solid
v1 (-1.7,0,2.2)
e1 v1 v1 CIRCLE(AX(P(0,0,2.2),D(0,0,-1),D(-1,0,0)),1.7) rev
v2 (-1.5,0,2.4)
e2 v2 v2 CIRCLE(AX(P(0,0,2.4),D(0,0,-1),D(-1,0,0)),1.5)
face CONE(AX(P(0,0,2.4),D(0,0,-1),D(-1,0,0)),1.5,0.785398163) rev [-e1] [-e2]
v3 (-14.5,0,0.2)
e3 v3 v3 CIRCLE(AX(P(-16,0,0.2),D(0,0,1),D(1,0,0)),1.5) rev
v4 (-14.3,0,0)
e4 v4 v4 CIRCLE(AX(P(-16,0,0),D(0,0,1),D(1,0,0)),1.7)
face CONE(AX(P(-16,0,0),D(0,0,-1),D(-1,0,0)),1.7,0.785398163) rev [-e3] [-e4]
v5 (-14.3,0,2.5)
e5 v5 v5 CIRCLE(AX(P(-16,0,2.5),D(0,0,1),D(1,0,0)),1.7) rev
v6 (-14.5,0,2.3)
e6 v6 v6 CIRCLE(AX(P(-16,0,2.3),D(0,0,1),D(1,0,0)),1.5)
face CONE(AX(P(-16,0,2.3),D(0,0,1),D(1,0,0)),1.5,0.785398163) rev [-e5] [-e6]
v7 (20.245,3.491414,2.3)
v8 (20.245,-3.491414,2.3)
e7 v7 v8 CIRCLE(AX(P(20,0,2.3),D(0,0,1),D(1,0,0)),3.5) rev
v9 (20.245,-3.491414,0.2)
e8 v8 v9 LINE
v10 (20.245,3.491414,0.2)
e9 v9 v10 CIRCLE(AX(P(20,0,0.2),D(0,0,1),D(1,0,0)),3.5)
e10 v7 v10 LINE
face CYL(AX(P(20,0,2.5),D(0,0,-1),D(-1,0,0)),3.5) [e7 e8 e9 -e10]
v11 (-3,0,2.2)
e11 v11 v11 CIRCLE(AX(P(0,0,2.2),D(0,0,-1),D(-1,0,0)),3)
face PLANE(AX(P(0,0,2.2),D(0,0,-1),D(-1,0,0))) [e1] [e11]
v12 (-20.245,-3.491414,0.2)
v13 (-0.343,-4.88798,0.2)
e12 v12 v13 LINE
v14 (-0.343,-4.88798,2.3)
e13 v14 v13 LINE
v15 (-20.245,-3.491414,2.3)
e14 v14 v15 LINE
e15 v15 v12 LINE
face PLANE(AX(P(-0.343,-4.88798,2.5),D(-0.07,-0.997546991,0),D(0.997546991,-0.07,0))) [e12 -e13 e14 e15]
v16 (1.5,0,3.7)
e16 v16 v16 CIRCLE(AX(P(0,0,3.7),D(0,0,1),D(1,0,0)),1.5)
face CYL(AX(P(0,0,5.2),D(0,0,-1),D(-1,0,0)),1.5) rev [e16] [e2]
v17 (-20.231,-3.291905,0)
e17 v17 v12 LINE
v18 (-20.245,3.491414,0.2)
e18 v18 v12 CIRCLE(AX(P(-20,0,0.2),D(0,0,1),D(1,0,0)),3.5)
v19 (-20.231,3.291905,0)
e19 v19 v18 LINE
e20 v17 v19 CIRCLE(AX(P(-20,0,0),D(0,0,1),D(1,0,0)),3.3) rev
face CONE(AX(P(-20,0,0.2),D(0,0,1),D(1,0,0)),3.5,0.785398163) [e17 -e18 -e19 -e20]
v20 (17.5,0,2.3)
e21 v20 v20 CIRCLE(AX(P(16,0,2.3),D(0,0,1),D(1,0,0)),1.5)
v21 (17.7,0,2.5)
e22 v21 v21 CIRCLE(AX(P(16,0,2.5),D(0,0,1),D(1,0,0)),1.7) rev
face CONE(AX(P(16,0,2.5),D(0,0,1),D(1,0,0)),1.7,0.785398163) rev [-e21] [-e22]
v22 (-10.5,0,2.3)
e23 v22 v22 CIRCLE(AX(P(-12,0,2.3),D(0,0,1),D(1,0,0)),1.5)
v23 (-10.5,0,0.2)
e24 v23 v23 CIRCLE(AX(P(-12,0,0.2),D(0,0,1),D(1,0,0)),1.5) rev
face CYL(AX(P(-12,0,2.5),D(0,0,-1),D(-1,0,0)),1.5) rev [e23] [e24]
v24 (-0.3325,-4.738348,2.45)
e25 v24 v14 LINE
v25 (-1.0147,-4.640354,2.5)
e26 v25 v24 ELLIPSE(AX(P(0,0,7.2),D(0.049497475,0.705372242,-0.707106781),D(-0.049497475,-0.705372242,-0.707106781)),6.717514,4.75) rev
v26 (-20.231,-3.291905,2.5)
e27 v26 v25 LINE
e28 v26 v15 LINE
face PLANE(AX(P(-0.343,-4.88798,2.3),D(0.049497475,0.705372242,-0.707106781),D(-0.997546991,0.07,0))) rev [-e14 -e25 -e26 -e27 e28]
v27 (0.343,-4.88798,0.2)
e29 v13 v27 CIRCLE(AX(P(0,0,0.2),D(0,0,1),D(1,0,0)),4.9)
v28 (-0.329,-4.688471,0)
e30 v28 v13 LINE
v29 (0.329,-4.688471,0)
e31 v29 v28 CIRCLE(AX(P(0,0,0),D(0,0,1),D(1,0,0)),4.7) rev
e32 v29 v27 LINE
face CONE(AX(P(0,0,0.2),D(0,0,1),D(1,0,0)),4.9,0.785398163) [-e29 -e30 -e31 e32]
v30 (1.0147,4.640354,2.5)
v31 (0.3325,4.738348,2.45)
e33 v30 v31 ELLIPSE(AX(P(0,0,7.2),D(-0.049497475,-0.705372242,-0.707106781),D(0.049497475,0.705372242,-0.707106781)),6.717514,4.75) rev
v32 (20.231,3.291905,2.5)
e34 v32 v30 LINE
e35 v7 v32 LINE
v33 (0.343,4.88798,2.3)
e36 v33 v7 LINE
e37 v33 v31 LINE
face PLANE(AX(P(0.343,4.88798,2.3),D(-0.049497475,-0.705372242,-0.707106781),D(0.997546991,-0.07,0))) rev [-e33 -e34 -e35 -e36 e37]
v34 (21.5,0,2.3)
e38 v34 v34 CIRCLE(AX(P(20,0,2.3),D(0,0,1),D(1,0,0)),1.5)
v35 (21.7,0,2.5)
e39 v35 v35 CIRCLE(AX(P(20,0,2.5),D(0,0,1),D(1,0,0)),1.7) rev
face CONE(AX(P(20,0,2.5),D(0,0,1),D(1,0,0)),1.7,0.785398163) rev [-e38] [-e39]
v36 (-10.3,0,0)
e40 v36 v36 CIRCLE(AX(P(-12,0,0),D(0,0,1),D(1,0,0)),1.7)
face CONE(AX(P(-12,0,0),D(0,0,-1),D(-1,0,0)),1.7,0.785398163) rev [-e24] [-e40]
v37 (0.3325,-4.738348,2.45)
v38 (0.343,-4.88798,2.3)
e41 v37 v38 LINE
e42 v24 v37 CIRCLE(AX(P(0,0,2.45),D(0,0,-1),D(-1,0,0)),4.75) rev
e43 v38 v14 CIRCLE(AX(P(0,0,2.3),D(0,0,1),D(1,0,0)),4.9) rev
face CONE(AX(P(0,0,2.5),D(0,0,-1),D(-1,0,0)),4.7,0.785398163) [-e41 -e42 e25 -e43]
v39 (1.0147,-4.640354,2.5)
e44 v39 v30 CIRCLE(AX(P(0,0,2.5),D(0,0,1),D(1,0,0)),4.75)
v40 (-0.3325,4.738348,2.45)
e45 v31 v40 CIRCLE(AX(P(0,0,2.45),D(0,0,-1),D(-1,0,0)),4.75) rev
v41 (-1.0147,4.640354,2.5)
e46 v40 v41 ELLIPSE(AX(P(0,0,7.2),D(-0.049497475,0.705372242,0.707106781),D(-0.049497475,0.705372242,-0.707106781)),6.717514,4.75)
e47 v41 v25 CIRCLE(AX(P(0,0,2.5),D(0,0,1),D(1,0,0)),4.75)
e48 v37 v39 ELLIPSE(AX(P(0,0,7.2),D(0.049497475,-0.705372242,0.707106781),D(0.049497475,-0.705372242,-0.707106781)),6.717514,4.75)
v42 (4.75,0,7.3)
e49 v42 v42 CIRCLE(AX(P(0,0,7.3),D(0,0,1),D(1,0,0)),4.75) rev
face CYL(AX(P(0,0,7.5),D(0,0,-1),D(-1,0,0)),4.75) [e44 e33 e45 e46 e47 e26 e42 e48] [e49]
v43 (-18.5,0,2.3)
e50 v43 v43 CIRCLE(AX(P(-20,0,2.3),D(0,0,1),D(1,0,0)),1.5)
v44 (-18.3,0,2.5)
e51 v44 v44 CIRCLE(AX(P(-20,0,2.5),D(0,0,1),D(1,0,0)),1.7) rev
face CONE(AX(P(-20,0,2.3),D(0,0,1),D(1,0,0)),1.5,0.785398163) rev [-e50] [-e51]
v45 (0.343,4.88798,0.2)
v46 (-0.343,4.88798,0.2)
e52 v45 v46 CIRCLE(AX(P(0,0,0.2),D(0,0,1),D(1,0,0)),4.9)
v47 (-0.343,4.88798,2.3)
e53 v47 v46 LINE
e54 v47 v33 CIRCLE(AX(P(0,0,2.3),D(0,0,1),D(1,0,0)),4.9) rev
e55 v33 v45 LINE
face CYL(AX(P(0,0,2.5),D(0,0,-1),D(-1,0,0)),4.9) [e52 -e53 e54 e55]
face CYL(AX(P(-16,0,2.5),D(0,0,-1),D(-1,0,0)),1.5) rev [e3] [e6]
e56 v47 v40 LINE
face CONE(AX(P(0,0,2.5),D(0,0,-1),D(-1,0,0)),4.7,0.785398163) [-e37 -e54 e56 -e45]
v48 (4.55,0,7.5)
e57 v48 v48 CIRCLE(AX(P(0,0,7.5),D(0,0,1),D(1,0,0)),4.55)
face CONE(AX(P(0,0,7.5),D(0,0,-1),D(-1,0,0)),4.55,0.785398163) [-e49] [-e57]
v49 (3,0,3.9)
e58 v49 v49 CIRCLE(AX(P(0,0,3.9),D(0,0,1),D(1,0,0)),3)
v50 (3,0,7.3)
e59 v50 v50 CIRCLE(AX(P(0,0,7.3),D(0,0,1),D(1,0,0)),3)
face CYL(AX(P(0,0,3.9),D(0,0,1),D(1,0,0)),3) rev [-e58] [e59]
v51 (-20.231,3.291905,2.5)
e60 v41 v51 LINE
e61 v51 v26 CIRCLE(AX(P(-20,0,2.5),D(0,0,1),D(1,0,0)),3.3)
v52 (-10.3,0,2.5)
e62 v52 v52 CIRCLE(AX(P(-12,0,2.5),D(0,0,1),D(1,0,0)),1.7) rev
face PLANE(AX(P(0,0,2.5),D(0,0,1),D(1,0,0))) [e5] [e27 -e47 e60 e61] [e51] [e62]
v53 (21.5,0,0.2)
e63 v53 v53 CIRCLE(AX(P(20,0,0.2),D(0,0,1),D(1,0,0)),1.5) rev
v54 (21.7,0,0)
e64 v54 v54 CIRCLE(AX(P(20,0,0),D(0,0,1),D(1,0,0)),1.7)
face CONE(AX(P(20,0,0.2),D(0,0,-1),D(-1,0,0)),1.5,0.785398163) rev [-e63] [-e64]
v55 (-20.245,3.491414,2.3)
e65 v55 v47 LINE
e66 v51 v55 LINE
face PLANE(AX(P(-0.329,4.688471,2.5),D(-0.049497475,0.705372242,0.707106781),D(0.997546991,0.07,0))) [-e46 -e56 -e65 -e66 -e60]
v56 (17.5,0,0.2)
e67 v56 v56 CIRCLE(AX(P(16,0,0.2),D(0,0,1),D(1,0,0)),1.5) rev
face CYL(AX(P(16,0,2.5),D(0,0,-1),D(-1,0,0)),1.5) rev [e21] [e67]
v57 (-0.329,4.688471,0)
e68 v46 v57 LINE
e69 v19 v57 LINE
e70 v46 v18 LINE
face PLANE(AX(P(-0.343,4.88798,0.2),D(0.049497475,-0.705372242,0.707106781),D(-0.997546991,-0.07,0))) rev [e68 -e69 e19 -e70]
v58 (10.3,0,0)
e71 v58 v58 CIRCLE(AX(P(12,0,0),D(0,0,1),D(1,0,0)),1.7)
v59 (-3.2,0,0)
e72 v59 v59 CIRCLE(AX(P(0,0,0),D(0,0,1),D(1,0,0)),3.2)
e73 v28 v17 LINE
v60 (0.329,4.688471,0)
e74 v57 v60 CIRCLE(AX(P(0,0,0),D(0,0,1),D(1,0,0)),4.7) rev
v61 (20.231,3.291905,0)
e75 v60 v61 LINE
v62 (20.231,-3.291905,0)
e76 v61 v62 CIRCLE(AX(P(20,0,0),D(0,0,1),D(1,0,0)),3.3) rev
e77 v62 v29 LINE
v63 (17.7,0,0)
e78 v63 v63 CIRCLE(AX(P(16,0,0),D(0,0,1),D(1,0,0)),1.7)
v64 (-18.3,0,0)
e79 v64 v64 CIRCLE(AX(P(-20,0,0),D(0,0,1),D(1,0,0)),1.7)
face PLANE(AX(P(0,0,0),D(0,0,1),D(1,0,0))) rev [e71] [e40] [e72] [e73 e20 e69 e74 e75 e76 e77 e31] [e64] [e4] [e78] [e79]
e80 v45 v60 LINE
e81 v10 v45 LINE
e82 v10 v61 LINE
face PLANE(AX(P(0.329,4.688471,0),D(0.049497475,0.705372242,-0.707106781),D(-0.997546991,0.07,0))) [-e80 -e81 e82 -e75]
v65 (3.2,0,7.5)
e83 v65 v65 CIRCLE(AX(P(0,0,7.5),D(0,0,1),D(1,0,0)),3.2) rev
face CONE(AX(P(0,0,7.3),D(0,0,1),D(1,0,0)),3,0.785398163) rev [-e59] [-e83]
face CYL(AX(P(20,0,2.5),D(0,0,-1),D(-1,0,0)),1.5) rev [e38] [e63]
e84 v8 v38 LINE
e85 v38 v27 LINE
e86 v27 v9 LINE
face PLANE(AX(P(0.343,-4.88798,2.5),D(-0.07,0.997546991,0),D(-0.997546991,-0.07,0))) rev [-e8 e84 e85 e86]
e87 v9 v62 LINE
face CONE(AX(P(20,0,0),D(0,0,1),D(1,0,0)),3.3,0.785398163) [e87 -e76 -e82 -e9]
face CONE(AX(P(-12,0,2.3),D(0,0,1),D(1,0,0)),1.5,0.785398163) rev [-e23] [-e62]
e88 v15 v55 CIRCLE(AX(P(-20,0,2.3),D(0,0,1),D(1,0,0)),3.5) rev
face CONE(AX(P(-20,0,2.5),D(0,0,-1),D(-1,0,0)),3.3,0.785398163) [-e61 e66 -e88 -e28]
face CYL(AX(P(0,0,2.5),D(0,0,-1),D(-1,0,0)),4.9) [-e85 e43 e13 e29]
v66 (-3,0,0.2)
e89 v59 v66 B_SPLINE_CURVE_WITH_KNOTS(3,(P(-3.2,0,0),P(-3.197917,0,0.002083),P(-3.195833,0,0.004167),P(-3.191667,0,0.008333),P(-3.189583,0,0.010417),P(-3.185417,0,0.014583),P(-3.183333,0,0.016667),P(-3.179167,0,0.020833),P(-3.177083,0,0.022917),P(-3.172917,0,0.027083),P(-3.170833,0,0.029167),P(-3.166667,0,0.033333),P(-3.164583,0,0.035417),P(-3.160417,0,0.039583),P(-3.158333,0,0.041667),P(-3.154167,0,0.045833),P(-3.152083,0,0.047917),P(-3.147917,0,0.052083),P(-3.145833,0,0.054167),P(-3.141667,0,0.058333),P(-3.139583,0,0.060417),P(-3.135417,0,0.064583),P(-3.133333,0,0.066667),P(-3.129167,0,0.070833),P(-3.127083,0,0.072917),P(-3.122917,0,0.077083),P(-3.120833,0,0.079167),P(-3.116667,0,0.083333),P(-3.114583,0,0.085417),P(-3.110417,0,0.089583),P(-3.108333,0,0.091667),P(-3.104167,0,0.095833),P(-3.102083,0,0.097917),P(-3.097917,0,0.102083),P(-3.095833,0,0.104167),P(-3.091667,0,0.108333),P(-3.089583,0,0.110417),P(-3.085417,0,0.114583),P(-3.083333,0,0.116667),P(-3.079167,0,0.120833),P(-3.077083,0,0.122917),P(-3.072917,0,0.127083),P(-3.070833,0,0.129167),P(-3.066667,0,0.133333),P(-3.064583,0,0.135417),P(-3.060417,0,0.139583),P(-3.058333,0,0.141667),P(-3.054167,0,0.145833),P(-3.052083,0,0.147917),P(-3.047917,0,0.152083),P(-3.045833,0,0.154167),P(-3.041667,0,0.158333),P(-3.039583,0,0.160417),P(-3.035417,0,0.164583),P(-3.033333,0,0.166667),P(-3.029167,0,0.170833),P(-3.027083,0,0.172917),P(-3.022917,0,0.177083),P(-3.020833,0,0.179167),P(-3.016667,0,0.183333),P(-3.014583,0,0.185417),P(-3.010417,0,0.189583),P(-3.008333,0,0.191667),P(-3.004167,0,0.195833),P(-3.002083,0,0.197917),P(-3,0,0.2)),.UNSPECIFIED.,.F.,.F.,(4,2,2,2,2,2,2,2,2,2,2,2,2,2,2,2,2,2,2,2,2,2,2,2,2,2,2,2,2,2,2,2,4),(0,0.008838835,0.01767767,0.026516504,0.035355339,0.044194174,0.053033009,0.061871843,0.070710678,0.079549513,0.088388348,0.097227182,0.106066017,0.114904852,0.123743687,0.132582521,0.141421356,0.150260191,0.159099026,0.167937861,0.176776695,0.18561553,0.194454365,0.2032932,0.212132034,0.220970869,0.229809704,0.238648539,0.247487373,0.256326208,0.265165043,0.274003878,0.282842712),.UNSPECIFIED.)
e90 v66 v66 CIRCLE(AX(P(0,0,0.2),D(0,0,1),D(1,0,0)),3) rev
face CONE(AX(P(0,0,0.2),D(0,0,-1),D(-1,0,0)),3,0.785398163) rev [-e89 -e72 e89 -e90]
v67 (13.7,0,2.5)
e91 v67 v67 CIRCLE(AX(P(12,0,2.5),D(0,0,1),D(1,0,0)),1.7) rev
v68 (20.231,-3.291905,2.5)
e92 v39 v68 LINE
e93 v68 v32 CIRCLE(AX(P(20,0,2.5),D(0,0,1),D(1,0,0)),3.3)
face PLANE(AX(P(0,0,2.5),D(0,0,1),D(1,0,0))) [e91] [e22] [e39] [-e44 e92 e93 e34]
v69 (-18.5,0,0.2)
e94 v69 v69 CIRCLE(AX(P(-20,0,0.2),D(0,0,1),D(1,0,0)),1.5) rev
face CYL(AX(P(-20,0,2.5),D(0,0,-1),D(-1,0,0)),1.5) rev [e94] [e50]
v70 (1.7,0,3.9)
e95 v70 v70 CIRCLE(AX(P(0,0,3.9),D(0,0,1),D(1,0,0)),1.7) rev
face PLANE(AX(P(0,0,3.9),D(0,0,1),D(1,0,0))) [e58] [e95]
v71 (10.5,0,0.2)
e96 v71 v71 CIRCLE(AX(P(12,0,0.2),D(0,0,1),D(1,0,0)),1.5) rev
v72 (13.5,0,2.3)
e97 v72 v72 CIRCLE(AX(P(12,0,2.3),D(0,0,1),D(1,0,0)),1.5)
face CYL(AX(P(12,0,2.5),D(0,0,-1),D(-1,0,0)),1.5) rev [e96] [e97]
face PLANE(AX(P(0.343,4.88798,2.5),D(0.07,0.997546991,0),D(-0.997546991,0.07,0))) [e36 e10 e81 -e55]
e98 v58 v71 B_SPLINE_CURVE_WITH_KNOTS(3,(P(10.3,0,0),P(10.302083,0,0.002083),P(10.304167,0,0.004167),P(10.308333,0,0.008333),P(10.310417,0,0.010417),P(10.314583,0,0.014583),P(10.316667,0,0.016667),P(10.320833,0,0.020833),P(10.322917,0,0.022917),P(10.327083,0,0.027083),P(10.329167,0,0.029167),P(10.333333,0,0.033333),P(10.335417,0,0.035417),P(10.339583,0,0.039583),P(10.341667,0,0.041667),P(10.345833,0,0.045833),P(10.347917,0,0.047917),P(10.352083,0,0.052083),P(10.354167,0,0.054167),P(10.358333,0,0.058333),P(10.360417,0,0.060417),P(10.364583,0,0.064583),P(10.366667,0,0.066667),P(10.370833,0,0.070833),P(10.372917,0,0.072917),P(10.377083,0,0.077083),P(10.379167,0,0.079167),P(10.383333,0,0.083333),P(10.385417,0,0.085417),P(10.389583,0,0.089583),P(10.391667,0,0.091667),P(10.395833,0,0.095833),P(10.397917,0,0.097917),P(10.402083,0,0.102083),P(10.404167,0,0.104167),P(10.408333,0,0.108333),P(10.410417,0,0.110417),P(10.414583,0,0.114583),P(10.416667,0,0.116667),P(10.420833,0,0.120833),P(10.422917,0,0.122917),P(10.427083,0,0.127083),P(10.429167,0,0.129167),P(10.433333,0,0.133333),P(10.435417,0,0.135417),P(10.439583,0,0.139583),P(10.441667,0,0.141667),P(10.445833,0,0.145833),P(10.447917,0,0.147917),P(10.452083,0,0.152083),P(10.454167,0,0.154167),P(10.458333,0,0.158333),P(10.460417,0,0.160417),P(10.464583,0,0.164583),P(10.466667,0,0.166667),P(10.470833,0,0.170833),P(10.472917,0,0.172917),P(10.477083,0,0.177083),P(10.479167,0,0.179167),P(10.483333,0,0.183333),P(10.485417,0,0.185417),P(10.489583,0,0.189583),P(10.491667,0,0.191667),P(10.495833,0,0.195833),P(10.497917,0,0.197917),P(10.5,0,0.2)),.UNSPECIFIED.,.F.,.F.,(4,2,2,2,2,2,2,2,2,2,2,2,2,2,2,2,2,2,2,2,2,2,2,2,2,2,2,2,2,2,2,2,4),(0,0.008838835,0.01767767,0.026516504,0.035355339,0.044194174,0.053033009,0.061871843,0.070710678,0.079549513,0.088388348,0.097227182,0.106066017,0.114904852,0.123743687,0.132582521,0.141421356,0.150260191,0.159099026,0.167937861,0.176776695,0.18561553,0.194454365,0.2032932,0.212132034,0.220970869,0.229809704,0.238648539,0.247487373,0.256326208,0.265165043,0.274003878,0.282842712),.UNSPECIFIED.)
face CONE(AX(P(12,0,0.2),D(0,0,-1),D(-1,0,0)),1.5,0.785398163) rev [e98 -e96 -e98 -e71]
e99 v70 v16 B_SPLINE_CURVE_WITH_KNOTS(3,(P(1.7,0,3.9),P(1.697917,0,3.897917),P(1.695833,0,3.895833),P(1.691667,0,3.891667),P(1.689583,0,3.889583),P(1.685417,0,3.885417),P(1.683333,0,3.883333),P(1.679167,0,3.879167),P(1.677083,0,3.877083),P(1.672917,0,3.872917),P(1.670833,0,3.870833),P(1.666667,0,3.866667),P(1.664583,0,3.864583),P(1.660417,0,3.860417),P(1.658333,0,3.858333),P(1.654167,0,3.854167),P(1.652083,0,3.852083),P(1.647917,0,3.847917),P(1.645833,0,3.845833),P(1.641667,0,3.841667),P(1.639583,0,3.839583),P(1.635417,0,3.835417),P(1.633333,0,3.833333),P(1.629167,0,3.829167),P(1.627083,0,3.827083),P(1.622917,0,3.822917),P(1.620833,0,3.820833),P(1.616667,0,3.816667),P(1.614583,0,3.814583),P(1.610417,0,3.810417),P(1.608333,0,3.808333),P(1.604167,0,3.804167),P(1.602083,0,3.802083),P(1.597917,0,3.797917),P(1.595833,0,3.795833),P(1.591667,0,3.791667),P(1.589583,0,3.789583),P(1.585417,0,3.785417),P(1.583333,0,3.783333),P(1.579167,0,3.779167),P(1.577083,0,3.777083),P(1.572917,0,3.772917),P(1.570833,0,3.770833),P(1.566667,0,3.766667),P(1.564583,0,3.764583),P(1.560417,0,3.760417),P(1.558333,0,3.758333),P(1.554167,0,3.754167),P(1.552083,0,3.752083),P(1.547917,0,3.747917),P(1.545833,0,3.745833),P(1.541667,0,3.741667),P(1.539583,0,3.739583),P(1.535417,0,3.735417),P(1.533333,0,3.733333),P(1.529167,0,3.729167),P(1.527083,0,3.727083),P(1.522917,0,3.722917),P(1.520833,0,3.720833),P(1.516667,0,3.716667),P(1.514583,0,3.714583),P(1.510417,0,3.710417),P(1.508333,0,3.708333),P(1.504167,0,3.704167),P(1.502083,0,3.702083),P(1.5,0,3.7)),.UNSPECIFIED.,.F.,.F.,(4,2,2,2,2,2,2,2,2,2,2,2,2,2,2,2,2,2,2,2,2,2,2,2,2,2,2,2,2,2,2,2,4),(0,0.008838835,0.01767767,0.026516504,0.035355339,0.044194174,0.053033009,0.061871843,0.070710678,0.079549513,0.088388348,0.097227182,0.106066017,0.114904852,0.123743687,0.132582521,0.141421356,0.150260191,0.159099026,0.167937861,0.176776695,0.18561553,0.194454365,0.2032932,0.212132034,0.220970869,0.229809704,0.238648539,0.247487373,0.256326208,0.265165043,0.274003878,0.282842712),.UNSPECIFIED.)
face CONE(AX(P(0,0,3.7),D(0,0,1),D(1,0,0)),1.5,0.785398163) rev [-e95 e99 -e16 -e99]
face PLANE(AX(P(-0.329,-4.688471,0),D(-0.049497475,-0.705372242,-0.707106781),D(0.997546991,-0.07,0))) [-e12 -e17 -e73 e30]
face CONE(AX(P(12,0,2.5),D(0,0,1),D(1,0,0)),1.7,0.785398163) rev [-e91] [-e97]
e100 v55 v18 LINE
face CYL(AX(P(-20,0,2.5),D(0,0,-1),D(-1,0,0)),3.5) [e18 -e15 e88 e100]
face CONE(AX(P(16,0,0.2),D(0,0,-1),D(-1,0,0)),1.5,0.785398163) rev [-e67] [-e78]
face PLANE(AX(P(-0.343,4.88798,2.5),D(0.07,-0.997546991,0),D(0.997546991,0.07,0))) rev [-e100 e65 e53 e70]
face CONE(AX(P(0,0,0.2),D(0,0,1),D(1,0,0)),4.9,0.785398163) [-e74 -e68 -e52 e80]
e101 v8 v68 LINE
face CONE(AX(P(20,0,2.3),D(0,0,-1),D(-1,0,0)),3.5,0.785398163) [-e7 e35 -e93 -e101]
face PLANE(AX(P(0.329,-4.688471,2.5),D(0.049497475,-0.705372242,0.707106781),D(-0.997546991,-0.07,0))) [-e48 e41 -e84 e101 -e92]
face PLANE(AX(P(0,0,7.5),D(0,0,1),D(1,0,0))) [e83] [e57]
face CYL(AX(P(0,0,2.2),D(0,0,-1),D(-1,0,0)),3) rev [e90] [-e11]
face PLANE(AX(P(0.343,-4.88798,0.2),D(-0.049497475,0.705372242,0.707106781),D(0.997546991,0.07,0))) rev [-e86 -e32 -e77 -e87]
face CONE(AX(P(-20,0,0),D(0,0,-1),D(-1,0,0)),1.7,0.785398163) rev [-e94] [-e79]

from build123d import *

# Parameters (mm, degrees)
SKETCH_1_R          = 1.5
EXTRUDE_1_DEPTH     = 2.5
SKETCH_2_R          = 4.75
EXTRUDE_2_DEPTH     = 5
SKETCH_3_R          = 3
CUT_EXTRUDE_1_DEPTH = 3.6
CUT_EXTRUDE_START   = -2.2
SKETCH_4_R          = 3
CUT_EXTRUDE_2_DEPTH = 2.2
SKETCH_5_R          = 1.5
CUT_EXTRUDE_3_DEPTH = 3
CHAMFER_1_SIZE      = 0.2


with BuildPart() as part:
    # 草图1 → 凸台-拉伸1 (new body)
    with BuildSketch(Plane.XY):
        with BuildLine():
            Line((0.343, 4.887980258), (20.245, 3.49141447))
            ThreePointArc((20.245, 3.49141447), (23.5, 0), (20.245, -3.49141447))
            Line((20.245, -3.49141447), (0.343, -4.887980258))
            ThreePointArc((0.343, -4.887980258), (0, -4.9), (-0.343, -4.887980258))
            Line((-0.343, -4.887980258), (-20.245, -3.49141447))
            ThreePointArc((-20.245, -3.49141447), (-23.5, 0), (-20.245, 3.49141447))
            Line((-20.245, 3.49141447), (-0.343, 4.887980258))
            ThreePointArc((-0.343, 4.887980258), (0, 4.9), (0.343, 4.887980258))
        make_face()
        with Locations((-12, 0)):
            Circle(SKETCH_1_R, mode=Mode.SUBTRACT)
        with Locations((-16, 0)):
            Circle(SKETCH_1_R, mode=Mode.SUBTRACT)
        with Locations((-20, 0)):
            Circle(SKETCH_1_R, mode=Mode.SUBTRACT)
        with Locations((20, 0)):
            Circle(SKETCH_1_R, mode=Mode.SUBTRACT)
        with Locations((16, 0)):
            Circle(SKETCH_1_R, mode=Mode.SUBTRACT)
        with Locations(Location((12, 0, 0), (0, 0, 180))):
            Circle(SKETCH_1_R, mode=Mode.SUBTRACT)
    extrude(amount=EXTRUDE_1_DEPTH)

    # 草图2 → 凸台-拉伸2 (add)
    with BuildSketch(Plane.XY.offset(2.5)):
        Circle(SKETCH_2_R)
    extrude(amount=EXTRUDE_2_DEPTH)

    # 草图3 → 切除-拉伸1 (cut)
    with BuildSketch(Plane.XY.offset(7.5)):
        Circle(SKETCH_3_R)
    extrude(amount=-CUT_EXTRUDE_1_DEPTH, mode=Mode.SUBTRACT)

    # 草图4 → 切除-拉伸2 (cut)
    with BuildSketch(Plane(origin=(0, 0, 0), x_dir=(-1, 0, 0), z_dir=(0, 0, -1)).offset(CUT_EXTRUDE_START)):
        with Locations(Location((0, 0, 0), (0, 0, 180))):
            Circle(SKETCH_4_R)
    extrude(amount=CUT_EXTRUDE_2_DEPTH, mode=Mode.SUBTRACT)

    # 草图5 → 切除-拉伸3 (cut)
    with BuildSketch(Plane(origin=(0, 0, 2.2), x_dir=(-1, 0, 0), z_dir=(0, 0, -1))):
        Circle(SKETCH_5_R)
    extrude(amount=-CUT_EXTRUDE_3_DEPTH, mode=Mode.SUBTRACT)

    # 倒角1
    # the kernel refuses this chamfer: 0.2 mm, written as the material it takes off along each edge
    with BuildSketch(Plane(origin=(-20, 0, 2.5), x_dir=(-0.06999999999999927, -0.9975469913743413, 0), z_dir=(0.9975469913743413, -0.06999999999999927, 0))) as chamfer_1_piece_1:
        Polygon((3.5, CHAMFER_1_SIZE), (3.5 - CHAMFER_1_SIZE, 0), (3.5, 0), align=None)
    revolve(axis=Axis((-20, 0, 2.5), (0, 0, -1)), revolution_arc=171.972025564, mode=Mode.SUBTRACT)
    with BuildSketch(Plane(origin=(-20.245, 3.49141447, 0), x_dir=(-0.0019247113627411001, 0.027428428988091162, 0.9996219169112966), z_dir=(0.9975469913743413, 0.07000000000000042, 0))) as chamfer_1_piece_2:
        Polygon((CHAMFER_1_SIZE * 0.999621916911, CHAMFER_1_SIZE * 0.0274958766106), (-CHAMFER_1_SIZE * 0.0274958766106, CHAMFER_1_SIZE * 0.999621916911), (0, 0), align=None)
    extrude(amount=19.950939827, mode=Mode.SUBTRACT)
    with BuildSketch(Plane(origin=(0, 0, 0), x_dir=(-0.0700000000000013, 0.9975469913743411, 0), z_dir=(-0.9975469913743411, -0.0700000000000013, 0))) as chamfer_1_piece_3:
        Polygon((4.9, -CHAMFER_1_SIZE), (4.9 - CHAMFER_1_SIZE, 0), (4.9, 0), align=None)
    revolve(axis=Axis((0, 0, 0), (0, 0, -1)), revolution_arc=8.027974436, mode=Mode.SUBTRACT)
    with BuildSketch(Plane(origin=(-0.343, -4.887980258, 2.5), x_dir=(0.06997353418379068, 0.9971698357267157, 0.02749587661058734), z_dir=(-0.9975469913743412, 0.06999999999999992, 0))) as chamfer_1_piece_4_section:
        Polygon((CHAMFER_1_SIZE * 0.999621916911, CHAMFER_1_SIZE * 0.0274958766106), (-CHAMFER_1_SIZE * 0.0274958766106, CHAMFER_1_SIZE * 0.999621916911), (0, 0), align=None)
    chamfer_1_piece_4 = extrude(amount=19.950939827, mode=Mode.PRIVATE)
    chamfer_1_piece_4 = chamfer_1_piece_4 - Plane(origin=(0, 0, 2.433954509), x_dir=(1, 0, 0), z_dir=(0, 0, -1)) * Cylinder(4.75, 41, mode=Mode.PRIVATE)
    add(chamfer_1_piece_4, mode=Mode.SUBTRACT)
    with BuildSketch(Plane(origin=(0, 0, 2.5), x_dir=(0.06999999999999668, -0.9975469913743414, 0), z_dir=(0.9975469913743414, 0.06999999999999668, 0))) as chamfer_1_piece_5_section:
        Polygon((4.9 - CHAMFER_1_SIZE, 0), (4.9, CHAMFER_1_SIZE), (4.9, 0), align=None)
    chamfer_1_piece_5 = revolve(axis=Axis((0, 0, 2.5), (0, 0, -1)), revolution_arc=8.027974436, mode=Mode.PRIVATE)
    chamfer_1_piece_5 = chamfer_1_piece_5 - Plane(origin=(0, 0, 2.429409395), x_dir=(1, 0, 0), z_dir=(0, 0, -1)) * Cylinder(4.75, 20, mode=Mode.PRIVATE)
    add(chamfer_1_piece_5, mode=Mode.SUBTRACT)
    with BuildSketch(Plane(origin=(20.245, -3.49141447, 2.5), x_dir=(-0.06997353418379093, 0.9971698357267157, 0.027495876610587357), z_dir=(-0.9975469913743413, -0.07000000000000017, 0))) as chamfer_1_piece_6_section:
        Polygon((CHAMFER_1_SIZE * 0.999621916911, CHAMFER_1_SIZE * 0.0274958766106), (-CHAMFER_1_SIZE * 0.0274958766106, CHAMFER_1_SIZE * 0.999621916911), (0, 0), align=None)
    chamfer_1_piece_6 = extrude(amount=19.950939827, mode=Mode.PRIVATE)
    chamfer_1_piece_6 = chamfer_1_piece_6 - Plane(origin=(0, 0, 2.433954509), x_dir=(1, 0, 0), z_dir=(0, 0, -1)) * Cylinder(4.75, 41, mode=Mode.PRIVATE)
    add(chamfer_1_piece_6, mode=Mode.SUBTRACT)
    with BuildSketch(Plane(origin=(-12, 0, 0), x_dir=(1, 0, 0), z_dir=(0, -1, 0))) as chamfer_1_piece_7:
        Polygon((1.5 + CHAMFER_1_SIZE, 0), (1.5, CHAMFER_1_SIZE), (1.5, 0), align=None)
    revolve(axis=Axis((-12, 0, 0), (0, 0, 1)), mode=Mode.SUBTRACT)
    with BuildSketch(Plane(origin=(-12, 0, 2.5), x_dir=(1, 0, 0), z_dir=(0, -1, 0))) as chamfer_1_piece_8:
        Polygon((1.5 + CHAMFER_1_SIZE, 0), (1.5, -CHAMFER_1_SIZE), (1.5, 0), align=None)
    revolve(axis=Axis((-12, 0, 2.5), (0, 0, 1)), mode=Mode.SUBTRACT)
    with BuildSketch(Plane(origin=(20, 0, 2.5), x_dir=(0.06999999999999927, 0.9975469913743413, 0), z_dir=(-0.9975469913743413, 0.06999999999999927, 0))) as chamfer_1_piece_9:
        Polygon((3.5 - CHAMFER_1_SIZE, 0), (3.5, CHAMFER_1_SIZE), (3.5, 0), align=None)
    revolve(axis=Axis((20, 0, 2.5), (0, 0, -1)), revolution_arc=171.972025564, mode=Mode.SUBTRACT)
    with BuildSketch(Plane(origin=(16, 0, 2.5), x_dir=(1, 0, 0), z_dir=(0, -1, 0))) as chamfer_1_piece_10:
        Polygon((1.5 + CHAMFER_1_SIZE, 0), (1.5, -CHAMFER_1_SIZE), (1.5, 0), align=None)
    revolve(axis=Axis((16, 0, 2.5), (0, 0, 1)), mode=Mode.SUBTRACT)
    with BuildSketch(Plane(origin=(0.343, 4.887980258, 2.5), x_dir=(-0.06997353418379092, -0.9971698357267157, 0.02749587661058734), z_dir=(0.9975469913743413, -0.07000000000000017, 0))) as chamfer_1_piece_11_section:
        Polygon((CHAMFER_1_SIZE * 0.999621916911, CHAMFER_1_SIZE * 0.0274958766106), (-CHAMFER_1_SIZE * 0.0274958766106, CHAMFER_1_SIZE * 0.999621916911), (0, 0), align=None)
    chamfer_1_piece_11 = extrude(amount=19.950939827, mode=Mode.PRIVATE)
    chamfer_1_piece_11 = chamfer_1_piece_11 - Plane(origin=(0, 0, 2.433954509), x_dir=(1, 0, 0), z_dir=(0, 0, -1)) * Cylinder(4.75, 41, mode=Mode.PRIVATE)
    add(chamfer_1_piece_11, mode=Mode.SUBTRACT)
    with BuildSketch(Plane(origin=(16, 0, 0), x_dir=(1, 0, 0), z_dir=(0, -1, 0))) as chamfer_1_piece_12:
        Polygon((1.5 + CHAMFER_1_SIZE, 0), (1.5, CHAMFER_1_SIZE), (1.5, 0), align=None)
    revolve(axis=Axis((16, 0, 0), (0, 0, 1)), mode=Mode.SUBTRACT)
    with BuildSketch(Plane(origin=(20, 0, 2.5), x_dir=(1, 0, 0), z_dir=(0, -1, 0))) as chamfer_1_piece_13:
        Polygon((1.5 + CHAMFER_1_SIZE, 0), (1.5, -CHAMFER_1_SIZE), (1.5, 0), align=None)
    revolve(axis=Axis((20, 0, 2.5), (0, 0, 1)), mode=Mode.SUBTRACT)
    with BuildSketch(Plane(origin=(20, 0, 0), x_dir=(1, 0, 0), z_dir=(0, -1, 0))) as chamfer_1_piece_14:
        Polygon((1.5 + CHAMFER_1_SIZE, 0), (1.5, CHAMFER_1_SIZE), (1.5, 0), align=None)
    revolve(axis=Axis((20, 0, 0), (0, 0, 1)), mode=Mode.SUBTRACT)
    with BuildSketch(Plane(origin=(-20, 0, 0), x_dir=(1, 0, 0), z_dir=(0, -1, 0))) as chamfer_1_piece_15:
        Polygon((1.5 + CHAMFER_1_SIZE, 0), (1.5, CHAMFER_1_SIZE), (1.5, 0), align=None)
    revolve(axis=Axis((-20, 0, 0), (0, 0, 1)), mode=Mode.SUBTRACT)
    with BuildSketch(Plane(origin=(-20, 0, 2.5), x_dir=(1, 0, 0), z_dir=(0, -1, 0))) as chamfer_1_piece_16:
        Polygon((1.5 + CHAMFER_1_SIZE, 0), (1.5, -CHAMFER_1_SIZE), (1.5, 0), align=None)
    revolve(axis=Axis((-20, 0, 2.5), (0, 0, 1)), mode=Mode.SUBTRACT)
    with BuildSketch(Plane(origin=(-16, 0, 0), x_dir=(1, 0, 0), z_dir=(0, -1, 0))) as chamfer_1_piece_17:
        Polygon((1.5 + CHAMFER_1_SIZE, 0), (1.5, CHAMFER_1_SIZE), (1.5, 0), align=None)
    revolve(axis=Axis((-16, 0, 0), (0, 0, 1)), mode=Mode.SUBTRACT)
    with BuildSketch(Plane(origin=(-16, 0, 2.5), x_dir=(1, 0, 0), z_dir=(0, -1, 0))) as chamfer_1_piece_18:
        Polygon((1.5 + CHAMFER_1_SIZE, 0), (1.5, -CHAMFER_1_SIZE), (1.5, 0), align=None)
    revolve(axis=Axis((-16, 0, 2.5), (0, 0, 1)), mode=Mode.SUBTRACT)
    with BuildSketch(Plane(origin=(0, 0, 2.5), x_dir=(-0.0700000000000013, 0.9975469913743411, 0), z_dir=(-0.9975469913743411, -0.0700000000000013, 0))) as chamfer_1_piece_19_section:
        Polygon((4.9, CHAMFER_1_SIZE), (4.9 - CHAMFER_1_SIZE, 0), (4.9, 0), align=None)
    chamfer_1_piece_19 = revolve(axis=Axis((0, 0, 2.5), (0, 0, -1)), revolution_arc=8.027974436, mode=Mode.PRIVATE)
    chamfer_1_piece_19 = chamfer_1_piece_19 - Plane(origin=(0, 0, 2.429409395), x_dir=(1, 0, 0), z_dir=(0, 0, -1)) * Cylinder(4.75, 20, mode=Mode.PRIVATE)
    add(chamfer_1_piece_19, mode=Mode.SUBTRACT)
    with BuildSketch(Plane(origin=(12, 0, 2.5), x_dir=(-1, 0, 0), z_dir=(0, 1, 0))) as chamfer_1_piece_20:
        Polygon((1.5 + CHAMFER_1_SIZE, 0), (1.5, -CHAMFER_1_SIZE), (1.5, 0), align=None)
    revolve(axis=Axis((12, 0, 2.5), (0, 0, 1)), mode=Mode.SUBTRACT)
    with BuildSketch(Plane(origin=(12, 0, 0), x_dir=(-1, 0, 0), z_dir=(0, 1, 0))) as chamfer_1_piece_21:
        Polygon((1.5 + CHAMFER_1_SIZE, 0), (1.5, CHAMFER_1_SIZE), (1.5, 0), align=None)
    revolve(axis=Axis((12, 0, 0), (0, 0, 1)), mode=Mode.SUBTRACT)
    with BuildSketch(Plane(origin=(0, 0, 7.5), x_dir=(1, 0, 0), z_dir=(0, -1, 0))) as chamfer_1_piece_22:
        Polygon((4.75, -CHAMFER_1_SIZE), (4.75 - CHAMFER_1_SIZE, 0), (4.75, 0), align=None)
    revolve(axis=Axis((0, 0, 7.5), (0, 0, 1)), mode=Mode.SUBTRACT)
    with BuildSketch(Plane(origin=(0, 0, 7.5), x_dir=(1, 0, 0), z_dir=(0, -1, 0))) as chamfer_1_piece_23:
        Polygon((3 + CHAMFER_1_SIZE, 0), (3, -CHAMFER_1_SIZE), (3, 0), align=None)
    revolve(axis=Axis((0, 0, 7.5), (0, 0, 1)), mode=Mode.SUBTRACT)
    with BuildSketch(Plane(origin=(0, 0, 0), x_dir=(1, 0, 0), z_dir=(0, 1, 0))) as chamfer_1_piece_24:
        Polygon((3 + CHAMFER_1_SIZE, 0), (3, -CHAMFER_1_SIZE), (3, 0), align=None)
    revolve(axis=Axis((0, 0, 0), (0, 0, -1)), mode=Mode.SUBTRACT)
    with BuildSketch(Plane(origin=(0, 0, 3.9), x_dir=(-1, 0, 0), z_dir=(0, -1, 0))) as chamfer_1_piece_25:
        Polygon((1.5, CHAMFER_1_SIZE), (1.5 + CHAMFER_1_SIZE, 0), (1.5, 0), align=None)
    revolve(axis=Axis((0, 0, 3.9), (0, 0, -1)), mode=Mode.SUBTRACT)
    with BuildSketch(Plane(origin=(0, 0, 2.2), x_dir=(-1, 0, 0), z_dir=(0, -1, 0))) as chamfer_1_piece_26:
        Polygon((1.5 + CHAMFER_1_SIZE, 0), (1.5, -CHAMFER_1_SIZE), (1.5, 0), align=None)
    revolve(axis=Axis((0, 0, 2.2), (0, 0, -1)), mode=Mode.SUBTRACT)
    with BuildSketch(Plane(origin=(-20.245, 3.49141447, 2.5), x_dir=(-0.0019247113627410969, 0.027428428988091114, -0.9996219169112966), z_dir=(0.9975469913743413, 0.07000000000000042, 0))) as chamfer_1_piece_27_section:
        Polygon((CHAMFER_1_SIZE * 0.999621916911, -CHAMFER_1_SIZE * 0.0274958766106), (-CHAMFER_1_SIZE * 0.0274958766106, -CHAMFER_1_SIZE * 0.999621916911), (0, 0), align=None)
    chamfer_1_piece_27 = extrude(amount=19.950939827, mode=Mode.PRIVATE)
    chamfer_1_piece_27 = chamfer_1_piece_27 - Plane(origin=(0, 0, 2.433954509), x_dir=(1, 0, 0), z_dir=(0, 0, -1)) * Cylinder(4.75, 41, mode=Mode.PRIVATE)
    add(chamfer_1_piece_27, mode=Mode.SUBTRACT)
    with BuildSketch(Plane(origin=(0.343, 4.887980258, 0), x_dir=(-0.06997353418379093, -0.9971698357267158, -0.027495876610586372), z_dir=(0.9975469913743413, -0.07000000000000017, 0)), Plane(origin=(20.245, -3.49141447, 0), x_dir=(-0.06997353418379093, 0.9971698357267158, -0.02749587661058639), z_dir=(-0.9975469913743413, -0.07000000000000017, 0)), Plane(origin=(-0.343, -4.887980258, 0), x_dir=(0.0699735341837907, 0.9971698357267158, -0.027495876610586372), z_dir=(-0.9975469913743412, 0.06999999999999992, 0))) as chamfer_1_piece_28:
        Polygon((CHAMFER_1_SIZE * 0.999621916911, -CHAMFER_1_SIZE * 0.0274958766106), (-CHAMFER_1_SIZE * 0.0274958766106, -CHAMFER_1_SIZE * 0.999621916911), (0, 0), align=None)
    extrude(amount=19.950939827, mode=Mode.SUBTRACT)
    with BuildSketch(Plane(origin=(20, 0, 0), x_dir=(0.06999999999999927, 0.9975469913743413, 0), z_dir=(-0.9975469913743413, 0.06999999999999927, 0))) as chamfer_1_piece_29:
        Polygon((3.5 - CHAMFER_1_SIZE, 0), (3.5, -CHAMFER_1_SIZE), (3.5, 0), align=None)
    revolve(axis=Axis((20, 0, 0), (0, 0, -1)), revolution_arc=171.972025564, mode=Mode.SUBTRACT)
    with BuildSketch(Plane(origin=(0, 0, 0), x_dir=(0.06999999999999668, -0.9975469913743414, 0), z_dir=(0.9975469913743414, 0.06999999999999668, 0))) as chamfer_1_piece_30:
        Polygon((4.9 - CHAMFER_1_SIZE, 0), (4.9, -CHAMFER_1_SIZE), (4.9, 0), align=None)
    revolve(axis=Axis((0, 0, 0), (0, 0, -1)), revolution_arc=8.027974436, mode=Mode.SUBTRACT)
    with BuildSketch(Plane(origin=(-20, 0, 0), x_dir=(-0.06999999999999927, -0.9975469913743413, 0), z_dir=(0.9975469913743413, -0.06999999999999927, 0))) as chamfer_1_piece_31:
        Polygon((3.5, -CHAMFER_1_SIZE), (3.5 - CHAMFER_1_SIZE, 0), (3.5, 0), align=None)
    revolve(axis=Axis((-20, 0, 0), (0, 0, -1)), revolution_arc=171.972025564, mode=Mode.SUBTRACT)


solid = part.part
